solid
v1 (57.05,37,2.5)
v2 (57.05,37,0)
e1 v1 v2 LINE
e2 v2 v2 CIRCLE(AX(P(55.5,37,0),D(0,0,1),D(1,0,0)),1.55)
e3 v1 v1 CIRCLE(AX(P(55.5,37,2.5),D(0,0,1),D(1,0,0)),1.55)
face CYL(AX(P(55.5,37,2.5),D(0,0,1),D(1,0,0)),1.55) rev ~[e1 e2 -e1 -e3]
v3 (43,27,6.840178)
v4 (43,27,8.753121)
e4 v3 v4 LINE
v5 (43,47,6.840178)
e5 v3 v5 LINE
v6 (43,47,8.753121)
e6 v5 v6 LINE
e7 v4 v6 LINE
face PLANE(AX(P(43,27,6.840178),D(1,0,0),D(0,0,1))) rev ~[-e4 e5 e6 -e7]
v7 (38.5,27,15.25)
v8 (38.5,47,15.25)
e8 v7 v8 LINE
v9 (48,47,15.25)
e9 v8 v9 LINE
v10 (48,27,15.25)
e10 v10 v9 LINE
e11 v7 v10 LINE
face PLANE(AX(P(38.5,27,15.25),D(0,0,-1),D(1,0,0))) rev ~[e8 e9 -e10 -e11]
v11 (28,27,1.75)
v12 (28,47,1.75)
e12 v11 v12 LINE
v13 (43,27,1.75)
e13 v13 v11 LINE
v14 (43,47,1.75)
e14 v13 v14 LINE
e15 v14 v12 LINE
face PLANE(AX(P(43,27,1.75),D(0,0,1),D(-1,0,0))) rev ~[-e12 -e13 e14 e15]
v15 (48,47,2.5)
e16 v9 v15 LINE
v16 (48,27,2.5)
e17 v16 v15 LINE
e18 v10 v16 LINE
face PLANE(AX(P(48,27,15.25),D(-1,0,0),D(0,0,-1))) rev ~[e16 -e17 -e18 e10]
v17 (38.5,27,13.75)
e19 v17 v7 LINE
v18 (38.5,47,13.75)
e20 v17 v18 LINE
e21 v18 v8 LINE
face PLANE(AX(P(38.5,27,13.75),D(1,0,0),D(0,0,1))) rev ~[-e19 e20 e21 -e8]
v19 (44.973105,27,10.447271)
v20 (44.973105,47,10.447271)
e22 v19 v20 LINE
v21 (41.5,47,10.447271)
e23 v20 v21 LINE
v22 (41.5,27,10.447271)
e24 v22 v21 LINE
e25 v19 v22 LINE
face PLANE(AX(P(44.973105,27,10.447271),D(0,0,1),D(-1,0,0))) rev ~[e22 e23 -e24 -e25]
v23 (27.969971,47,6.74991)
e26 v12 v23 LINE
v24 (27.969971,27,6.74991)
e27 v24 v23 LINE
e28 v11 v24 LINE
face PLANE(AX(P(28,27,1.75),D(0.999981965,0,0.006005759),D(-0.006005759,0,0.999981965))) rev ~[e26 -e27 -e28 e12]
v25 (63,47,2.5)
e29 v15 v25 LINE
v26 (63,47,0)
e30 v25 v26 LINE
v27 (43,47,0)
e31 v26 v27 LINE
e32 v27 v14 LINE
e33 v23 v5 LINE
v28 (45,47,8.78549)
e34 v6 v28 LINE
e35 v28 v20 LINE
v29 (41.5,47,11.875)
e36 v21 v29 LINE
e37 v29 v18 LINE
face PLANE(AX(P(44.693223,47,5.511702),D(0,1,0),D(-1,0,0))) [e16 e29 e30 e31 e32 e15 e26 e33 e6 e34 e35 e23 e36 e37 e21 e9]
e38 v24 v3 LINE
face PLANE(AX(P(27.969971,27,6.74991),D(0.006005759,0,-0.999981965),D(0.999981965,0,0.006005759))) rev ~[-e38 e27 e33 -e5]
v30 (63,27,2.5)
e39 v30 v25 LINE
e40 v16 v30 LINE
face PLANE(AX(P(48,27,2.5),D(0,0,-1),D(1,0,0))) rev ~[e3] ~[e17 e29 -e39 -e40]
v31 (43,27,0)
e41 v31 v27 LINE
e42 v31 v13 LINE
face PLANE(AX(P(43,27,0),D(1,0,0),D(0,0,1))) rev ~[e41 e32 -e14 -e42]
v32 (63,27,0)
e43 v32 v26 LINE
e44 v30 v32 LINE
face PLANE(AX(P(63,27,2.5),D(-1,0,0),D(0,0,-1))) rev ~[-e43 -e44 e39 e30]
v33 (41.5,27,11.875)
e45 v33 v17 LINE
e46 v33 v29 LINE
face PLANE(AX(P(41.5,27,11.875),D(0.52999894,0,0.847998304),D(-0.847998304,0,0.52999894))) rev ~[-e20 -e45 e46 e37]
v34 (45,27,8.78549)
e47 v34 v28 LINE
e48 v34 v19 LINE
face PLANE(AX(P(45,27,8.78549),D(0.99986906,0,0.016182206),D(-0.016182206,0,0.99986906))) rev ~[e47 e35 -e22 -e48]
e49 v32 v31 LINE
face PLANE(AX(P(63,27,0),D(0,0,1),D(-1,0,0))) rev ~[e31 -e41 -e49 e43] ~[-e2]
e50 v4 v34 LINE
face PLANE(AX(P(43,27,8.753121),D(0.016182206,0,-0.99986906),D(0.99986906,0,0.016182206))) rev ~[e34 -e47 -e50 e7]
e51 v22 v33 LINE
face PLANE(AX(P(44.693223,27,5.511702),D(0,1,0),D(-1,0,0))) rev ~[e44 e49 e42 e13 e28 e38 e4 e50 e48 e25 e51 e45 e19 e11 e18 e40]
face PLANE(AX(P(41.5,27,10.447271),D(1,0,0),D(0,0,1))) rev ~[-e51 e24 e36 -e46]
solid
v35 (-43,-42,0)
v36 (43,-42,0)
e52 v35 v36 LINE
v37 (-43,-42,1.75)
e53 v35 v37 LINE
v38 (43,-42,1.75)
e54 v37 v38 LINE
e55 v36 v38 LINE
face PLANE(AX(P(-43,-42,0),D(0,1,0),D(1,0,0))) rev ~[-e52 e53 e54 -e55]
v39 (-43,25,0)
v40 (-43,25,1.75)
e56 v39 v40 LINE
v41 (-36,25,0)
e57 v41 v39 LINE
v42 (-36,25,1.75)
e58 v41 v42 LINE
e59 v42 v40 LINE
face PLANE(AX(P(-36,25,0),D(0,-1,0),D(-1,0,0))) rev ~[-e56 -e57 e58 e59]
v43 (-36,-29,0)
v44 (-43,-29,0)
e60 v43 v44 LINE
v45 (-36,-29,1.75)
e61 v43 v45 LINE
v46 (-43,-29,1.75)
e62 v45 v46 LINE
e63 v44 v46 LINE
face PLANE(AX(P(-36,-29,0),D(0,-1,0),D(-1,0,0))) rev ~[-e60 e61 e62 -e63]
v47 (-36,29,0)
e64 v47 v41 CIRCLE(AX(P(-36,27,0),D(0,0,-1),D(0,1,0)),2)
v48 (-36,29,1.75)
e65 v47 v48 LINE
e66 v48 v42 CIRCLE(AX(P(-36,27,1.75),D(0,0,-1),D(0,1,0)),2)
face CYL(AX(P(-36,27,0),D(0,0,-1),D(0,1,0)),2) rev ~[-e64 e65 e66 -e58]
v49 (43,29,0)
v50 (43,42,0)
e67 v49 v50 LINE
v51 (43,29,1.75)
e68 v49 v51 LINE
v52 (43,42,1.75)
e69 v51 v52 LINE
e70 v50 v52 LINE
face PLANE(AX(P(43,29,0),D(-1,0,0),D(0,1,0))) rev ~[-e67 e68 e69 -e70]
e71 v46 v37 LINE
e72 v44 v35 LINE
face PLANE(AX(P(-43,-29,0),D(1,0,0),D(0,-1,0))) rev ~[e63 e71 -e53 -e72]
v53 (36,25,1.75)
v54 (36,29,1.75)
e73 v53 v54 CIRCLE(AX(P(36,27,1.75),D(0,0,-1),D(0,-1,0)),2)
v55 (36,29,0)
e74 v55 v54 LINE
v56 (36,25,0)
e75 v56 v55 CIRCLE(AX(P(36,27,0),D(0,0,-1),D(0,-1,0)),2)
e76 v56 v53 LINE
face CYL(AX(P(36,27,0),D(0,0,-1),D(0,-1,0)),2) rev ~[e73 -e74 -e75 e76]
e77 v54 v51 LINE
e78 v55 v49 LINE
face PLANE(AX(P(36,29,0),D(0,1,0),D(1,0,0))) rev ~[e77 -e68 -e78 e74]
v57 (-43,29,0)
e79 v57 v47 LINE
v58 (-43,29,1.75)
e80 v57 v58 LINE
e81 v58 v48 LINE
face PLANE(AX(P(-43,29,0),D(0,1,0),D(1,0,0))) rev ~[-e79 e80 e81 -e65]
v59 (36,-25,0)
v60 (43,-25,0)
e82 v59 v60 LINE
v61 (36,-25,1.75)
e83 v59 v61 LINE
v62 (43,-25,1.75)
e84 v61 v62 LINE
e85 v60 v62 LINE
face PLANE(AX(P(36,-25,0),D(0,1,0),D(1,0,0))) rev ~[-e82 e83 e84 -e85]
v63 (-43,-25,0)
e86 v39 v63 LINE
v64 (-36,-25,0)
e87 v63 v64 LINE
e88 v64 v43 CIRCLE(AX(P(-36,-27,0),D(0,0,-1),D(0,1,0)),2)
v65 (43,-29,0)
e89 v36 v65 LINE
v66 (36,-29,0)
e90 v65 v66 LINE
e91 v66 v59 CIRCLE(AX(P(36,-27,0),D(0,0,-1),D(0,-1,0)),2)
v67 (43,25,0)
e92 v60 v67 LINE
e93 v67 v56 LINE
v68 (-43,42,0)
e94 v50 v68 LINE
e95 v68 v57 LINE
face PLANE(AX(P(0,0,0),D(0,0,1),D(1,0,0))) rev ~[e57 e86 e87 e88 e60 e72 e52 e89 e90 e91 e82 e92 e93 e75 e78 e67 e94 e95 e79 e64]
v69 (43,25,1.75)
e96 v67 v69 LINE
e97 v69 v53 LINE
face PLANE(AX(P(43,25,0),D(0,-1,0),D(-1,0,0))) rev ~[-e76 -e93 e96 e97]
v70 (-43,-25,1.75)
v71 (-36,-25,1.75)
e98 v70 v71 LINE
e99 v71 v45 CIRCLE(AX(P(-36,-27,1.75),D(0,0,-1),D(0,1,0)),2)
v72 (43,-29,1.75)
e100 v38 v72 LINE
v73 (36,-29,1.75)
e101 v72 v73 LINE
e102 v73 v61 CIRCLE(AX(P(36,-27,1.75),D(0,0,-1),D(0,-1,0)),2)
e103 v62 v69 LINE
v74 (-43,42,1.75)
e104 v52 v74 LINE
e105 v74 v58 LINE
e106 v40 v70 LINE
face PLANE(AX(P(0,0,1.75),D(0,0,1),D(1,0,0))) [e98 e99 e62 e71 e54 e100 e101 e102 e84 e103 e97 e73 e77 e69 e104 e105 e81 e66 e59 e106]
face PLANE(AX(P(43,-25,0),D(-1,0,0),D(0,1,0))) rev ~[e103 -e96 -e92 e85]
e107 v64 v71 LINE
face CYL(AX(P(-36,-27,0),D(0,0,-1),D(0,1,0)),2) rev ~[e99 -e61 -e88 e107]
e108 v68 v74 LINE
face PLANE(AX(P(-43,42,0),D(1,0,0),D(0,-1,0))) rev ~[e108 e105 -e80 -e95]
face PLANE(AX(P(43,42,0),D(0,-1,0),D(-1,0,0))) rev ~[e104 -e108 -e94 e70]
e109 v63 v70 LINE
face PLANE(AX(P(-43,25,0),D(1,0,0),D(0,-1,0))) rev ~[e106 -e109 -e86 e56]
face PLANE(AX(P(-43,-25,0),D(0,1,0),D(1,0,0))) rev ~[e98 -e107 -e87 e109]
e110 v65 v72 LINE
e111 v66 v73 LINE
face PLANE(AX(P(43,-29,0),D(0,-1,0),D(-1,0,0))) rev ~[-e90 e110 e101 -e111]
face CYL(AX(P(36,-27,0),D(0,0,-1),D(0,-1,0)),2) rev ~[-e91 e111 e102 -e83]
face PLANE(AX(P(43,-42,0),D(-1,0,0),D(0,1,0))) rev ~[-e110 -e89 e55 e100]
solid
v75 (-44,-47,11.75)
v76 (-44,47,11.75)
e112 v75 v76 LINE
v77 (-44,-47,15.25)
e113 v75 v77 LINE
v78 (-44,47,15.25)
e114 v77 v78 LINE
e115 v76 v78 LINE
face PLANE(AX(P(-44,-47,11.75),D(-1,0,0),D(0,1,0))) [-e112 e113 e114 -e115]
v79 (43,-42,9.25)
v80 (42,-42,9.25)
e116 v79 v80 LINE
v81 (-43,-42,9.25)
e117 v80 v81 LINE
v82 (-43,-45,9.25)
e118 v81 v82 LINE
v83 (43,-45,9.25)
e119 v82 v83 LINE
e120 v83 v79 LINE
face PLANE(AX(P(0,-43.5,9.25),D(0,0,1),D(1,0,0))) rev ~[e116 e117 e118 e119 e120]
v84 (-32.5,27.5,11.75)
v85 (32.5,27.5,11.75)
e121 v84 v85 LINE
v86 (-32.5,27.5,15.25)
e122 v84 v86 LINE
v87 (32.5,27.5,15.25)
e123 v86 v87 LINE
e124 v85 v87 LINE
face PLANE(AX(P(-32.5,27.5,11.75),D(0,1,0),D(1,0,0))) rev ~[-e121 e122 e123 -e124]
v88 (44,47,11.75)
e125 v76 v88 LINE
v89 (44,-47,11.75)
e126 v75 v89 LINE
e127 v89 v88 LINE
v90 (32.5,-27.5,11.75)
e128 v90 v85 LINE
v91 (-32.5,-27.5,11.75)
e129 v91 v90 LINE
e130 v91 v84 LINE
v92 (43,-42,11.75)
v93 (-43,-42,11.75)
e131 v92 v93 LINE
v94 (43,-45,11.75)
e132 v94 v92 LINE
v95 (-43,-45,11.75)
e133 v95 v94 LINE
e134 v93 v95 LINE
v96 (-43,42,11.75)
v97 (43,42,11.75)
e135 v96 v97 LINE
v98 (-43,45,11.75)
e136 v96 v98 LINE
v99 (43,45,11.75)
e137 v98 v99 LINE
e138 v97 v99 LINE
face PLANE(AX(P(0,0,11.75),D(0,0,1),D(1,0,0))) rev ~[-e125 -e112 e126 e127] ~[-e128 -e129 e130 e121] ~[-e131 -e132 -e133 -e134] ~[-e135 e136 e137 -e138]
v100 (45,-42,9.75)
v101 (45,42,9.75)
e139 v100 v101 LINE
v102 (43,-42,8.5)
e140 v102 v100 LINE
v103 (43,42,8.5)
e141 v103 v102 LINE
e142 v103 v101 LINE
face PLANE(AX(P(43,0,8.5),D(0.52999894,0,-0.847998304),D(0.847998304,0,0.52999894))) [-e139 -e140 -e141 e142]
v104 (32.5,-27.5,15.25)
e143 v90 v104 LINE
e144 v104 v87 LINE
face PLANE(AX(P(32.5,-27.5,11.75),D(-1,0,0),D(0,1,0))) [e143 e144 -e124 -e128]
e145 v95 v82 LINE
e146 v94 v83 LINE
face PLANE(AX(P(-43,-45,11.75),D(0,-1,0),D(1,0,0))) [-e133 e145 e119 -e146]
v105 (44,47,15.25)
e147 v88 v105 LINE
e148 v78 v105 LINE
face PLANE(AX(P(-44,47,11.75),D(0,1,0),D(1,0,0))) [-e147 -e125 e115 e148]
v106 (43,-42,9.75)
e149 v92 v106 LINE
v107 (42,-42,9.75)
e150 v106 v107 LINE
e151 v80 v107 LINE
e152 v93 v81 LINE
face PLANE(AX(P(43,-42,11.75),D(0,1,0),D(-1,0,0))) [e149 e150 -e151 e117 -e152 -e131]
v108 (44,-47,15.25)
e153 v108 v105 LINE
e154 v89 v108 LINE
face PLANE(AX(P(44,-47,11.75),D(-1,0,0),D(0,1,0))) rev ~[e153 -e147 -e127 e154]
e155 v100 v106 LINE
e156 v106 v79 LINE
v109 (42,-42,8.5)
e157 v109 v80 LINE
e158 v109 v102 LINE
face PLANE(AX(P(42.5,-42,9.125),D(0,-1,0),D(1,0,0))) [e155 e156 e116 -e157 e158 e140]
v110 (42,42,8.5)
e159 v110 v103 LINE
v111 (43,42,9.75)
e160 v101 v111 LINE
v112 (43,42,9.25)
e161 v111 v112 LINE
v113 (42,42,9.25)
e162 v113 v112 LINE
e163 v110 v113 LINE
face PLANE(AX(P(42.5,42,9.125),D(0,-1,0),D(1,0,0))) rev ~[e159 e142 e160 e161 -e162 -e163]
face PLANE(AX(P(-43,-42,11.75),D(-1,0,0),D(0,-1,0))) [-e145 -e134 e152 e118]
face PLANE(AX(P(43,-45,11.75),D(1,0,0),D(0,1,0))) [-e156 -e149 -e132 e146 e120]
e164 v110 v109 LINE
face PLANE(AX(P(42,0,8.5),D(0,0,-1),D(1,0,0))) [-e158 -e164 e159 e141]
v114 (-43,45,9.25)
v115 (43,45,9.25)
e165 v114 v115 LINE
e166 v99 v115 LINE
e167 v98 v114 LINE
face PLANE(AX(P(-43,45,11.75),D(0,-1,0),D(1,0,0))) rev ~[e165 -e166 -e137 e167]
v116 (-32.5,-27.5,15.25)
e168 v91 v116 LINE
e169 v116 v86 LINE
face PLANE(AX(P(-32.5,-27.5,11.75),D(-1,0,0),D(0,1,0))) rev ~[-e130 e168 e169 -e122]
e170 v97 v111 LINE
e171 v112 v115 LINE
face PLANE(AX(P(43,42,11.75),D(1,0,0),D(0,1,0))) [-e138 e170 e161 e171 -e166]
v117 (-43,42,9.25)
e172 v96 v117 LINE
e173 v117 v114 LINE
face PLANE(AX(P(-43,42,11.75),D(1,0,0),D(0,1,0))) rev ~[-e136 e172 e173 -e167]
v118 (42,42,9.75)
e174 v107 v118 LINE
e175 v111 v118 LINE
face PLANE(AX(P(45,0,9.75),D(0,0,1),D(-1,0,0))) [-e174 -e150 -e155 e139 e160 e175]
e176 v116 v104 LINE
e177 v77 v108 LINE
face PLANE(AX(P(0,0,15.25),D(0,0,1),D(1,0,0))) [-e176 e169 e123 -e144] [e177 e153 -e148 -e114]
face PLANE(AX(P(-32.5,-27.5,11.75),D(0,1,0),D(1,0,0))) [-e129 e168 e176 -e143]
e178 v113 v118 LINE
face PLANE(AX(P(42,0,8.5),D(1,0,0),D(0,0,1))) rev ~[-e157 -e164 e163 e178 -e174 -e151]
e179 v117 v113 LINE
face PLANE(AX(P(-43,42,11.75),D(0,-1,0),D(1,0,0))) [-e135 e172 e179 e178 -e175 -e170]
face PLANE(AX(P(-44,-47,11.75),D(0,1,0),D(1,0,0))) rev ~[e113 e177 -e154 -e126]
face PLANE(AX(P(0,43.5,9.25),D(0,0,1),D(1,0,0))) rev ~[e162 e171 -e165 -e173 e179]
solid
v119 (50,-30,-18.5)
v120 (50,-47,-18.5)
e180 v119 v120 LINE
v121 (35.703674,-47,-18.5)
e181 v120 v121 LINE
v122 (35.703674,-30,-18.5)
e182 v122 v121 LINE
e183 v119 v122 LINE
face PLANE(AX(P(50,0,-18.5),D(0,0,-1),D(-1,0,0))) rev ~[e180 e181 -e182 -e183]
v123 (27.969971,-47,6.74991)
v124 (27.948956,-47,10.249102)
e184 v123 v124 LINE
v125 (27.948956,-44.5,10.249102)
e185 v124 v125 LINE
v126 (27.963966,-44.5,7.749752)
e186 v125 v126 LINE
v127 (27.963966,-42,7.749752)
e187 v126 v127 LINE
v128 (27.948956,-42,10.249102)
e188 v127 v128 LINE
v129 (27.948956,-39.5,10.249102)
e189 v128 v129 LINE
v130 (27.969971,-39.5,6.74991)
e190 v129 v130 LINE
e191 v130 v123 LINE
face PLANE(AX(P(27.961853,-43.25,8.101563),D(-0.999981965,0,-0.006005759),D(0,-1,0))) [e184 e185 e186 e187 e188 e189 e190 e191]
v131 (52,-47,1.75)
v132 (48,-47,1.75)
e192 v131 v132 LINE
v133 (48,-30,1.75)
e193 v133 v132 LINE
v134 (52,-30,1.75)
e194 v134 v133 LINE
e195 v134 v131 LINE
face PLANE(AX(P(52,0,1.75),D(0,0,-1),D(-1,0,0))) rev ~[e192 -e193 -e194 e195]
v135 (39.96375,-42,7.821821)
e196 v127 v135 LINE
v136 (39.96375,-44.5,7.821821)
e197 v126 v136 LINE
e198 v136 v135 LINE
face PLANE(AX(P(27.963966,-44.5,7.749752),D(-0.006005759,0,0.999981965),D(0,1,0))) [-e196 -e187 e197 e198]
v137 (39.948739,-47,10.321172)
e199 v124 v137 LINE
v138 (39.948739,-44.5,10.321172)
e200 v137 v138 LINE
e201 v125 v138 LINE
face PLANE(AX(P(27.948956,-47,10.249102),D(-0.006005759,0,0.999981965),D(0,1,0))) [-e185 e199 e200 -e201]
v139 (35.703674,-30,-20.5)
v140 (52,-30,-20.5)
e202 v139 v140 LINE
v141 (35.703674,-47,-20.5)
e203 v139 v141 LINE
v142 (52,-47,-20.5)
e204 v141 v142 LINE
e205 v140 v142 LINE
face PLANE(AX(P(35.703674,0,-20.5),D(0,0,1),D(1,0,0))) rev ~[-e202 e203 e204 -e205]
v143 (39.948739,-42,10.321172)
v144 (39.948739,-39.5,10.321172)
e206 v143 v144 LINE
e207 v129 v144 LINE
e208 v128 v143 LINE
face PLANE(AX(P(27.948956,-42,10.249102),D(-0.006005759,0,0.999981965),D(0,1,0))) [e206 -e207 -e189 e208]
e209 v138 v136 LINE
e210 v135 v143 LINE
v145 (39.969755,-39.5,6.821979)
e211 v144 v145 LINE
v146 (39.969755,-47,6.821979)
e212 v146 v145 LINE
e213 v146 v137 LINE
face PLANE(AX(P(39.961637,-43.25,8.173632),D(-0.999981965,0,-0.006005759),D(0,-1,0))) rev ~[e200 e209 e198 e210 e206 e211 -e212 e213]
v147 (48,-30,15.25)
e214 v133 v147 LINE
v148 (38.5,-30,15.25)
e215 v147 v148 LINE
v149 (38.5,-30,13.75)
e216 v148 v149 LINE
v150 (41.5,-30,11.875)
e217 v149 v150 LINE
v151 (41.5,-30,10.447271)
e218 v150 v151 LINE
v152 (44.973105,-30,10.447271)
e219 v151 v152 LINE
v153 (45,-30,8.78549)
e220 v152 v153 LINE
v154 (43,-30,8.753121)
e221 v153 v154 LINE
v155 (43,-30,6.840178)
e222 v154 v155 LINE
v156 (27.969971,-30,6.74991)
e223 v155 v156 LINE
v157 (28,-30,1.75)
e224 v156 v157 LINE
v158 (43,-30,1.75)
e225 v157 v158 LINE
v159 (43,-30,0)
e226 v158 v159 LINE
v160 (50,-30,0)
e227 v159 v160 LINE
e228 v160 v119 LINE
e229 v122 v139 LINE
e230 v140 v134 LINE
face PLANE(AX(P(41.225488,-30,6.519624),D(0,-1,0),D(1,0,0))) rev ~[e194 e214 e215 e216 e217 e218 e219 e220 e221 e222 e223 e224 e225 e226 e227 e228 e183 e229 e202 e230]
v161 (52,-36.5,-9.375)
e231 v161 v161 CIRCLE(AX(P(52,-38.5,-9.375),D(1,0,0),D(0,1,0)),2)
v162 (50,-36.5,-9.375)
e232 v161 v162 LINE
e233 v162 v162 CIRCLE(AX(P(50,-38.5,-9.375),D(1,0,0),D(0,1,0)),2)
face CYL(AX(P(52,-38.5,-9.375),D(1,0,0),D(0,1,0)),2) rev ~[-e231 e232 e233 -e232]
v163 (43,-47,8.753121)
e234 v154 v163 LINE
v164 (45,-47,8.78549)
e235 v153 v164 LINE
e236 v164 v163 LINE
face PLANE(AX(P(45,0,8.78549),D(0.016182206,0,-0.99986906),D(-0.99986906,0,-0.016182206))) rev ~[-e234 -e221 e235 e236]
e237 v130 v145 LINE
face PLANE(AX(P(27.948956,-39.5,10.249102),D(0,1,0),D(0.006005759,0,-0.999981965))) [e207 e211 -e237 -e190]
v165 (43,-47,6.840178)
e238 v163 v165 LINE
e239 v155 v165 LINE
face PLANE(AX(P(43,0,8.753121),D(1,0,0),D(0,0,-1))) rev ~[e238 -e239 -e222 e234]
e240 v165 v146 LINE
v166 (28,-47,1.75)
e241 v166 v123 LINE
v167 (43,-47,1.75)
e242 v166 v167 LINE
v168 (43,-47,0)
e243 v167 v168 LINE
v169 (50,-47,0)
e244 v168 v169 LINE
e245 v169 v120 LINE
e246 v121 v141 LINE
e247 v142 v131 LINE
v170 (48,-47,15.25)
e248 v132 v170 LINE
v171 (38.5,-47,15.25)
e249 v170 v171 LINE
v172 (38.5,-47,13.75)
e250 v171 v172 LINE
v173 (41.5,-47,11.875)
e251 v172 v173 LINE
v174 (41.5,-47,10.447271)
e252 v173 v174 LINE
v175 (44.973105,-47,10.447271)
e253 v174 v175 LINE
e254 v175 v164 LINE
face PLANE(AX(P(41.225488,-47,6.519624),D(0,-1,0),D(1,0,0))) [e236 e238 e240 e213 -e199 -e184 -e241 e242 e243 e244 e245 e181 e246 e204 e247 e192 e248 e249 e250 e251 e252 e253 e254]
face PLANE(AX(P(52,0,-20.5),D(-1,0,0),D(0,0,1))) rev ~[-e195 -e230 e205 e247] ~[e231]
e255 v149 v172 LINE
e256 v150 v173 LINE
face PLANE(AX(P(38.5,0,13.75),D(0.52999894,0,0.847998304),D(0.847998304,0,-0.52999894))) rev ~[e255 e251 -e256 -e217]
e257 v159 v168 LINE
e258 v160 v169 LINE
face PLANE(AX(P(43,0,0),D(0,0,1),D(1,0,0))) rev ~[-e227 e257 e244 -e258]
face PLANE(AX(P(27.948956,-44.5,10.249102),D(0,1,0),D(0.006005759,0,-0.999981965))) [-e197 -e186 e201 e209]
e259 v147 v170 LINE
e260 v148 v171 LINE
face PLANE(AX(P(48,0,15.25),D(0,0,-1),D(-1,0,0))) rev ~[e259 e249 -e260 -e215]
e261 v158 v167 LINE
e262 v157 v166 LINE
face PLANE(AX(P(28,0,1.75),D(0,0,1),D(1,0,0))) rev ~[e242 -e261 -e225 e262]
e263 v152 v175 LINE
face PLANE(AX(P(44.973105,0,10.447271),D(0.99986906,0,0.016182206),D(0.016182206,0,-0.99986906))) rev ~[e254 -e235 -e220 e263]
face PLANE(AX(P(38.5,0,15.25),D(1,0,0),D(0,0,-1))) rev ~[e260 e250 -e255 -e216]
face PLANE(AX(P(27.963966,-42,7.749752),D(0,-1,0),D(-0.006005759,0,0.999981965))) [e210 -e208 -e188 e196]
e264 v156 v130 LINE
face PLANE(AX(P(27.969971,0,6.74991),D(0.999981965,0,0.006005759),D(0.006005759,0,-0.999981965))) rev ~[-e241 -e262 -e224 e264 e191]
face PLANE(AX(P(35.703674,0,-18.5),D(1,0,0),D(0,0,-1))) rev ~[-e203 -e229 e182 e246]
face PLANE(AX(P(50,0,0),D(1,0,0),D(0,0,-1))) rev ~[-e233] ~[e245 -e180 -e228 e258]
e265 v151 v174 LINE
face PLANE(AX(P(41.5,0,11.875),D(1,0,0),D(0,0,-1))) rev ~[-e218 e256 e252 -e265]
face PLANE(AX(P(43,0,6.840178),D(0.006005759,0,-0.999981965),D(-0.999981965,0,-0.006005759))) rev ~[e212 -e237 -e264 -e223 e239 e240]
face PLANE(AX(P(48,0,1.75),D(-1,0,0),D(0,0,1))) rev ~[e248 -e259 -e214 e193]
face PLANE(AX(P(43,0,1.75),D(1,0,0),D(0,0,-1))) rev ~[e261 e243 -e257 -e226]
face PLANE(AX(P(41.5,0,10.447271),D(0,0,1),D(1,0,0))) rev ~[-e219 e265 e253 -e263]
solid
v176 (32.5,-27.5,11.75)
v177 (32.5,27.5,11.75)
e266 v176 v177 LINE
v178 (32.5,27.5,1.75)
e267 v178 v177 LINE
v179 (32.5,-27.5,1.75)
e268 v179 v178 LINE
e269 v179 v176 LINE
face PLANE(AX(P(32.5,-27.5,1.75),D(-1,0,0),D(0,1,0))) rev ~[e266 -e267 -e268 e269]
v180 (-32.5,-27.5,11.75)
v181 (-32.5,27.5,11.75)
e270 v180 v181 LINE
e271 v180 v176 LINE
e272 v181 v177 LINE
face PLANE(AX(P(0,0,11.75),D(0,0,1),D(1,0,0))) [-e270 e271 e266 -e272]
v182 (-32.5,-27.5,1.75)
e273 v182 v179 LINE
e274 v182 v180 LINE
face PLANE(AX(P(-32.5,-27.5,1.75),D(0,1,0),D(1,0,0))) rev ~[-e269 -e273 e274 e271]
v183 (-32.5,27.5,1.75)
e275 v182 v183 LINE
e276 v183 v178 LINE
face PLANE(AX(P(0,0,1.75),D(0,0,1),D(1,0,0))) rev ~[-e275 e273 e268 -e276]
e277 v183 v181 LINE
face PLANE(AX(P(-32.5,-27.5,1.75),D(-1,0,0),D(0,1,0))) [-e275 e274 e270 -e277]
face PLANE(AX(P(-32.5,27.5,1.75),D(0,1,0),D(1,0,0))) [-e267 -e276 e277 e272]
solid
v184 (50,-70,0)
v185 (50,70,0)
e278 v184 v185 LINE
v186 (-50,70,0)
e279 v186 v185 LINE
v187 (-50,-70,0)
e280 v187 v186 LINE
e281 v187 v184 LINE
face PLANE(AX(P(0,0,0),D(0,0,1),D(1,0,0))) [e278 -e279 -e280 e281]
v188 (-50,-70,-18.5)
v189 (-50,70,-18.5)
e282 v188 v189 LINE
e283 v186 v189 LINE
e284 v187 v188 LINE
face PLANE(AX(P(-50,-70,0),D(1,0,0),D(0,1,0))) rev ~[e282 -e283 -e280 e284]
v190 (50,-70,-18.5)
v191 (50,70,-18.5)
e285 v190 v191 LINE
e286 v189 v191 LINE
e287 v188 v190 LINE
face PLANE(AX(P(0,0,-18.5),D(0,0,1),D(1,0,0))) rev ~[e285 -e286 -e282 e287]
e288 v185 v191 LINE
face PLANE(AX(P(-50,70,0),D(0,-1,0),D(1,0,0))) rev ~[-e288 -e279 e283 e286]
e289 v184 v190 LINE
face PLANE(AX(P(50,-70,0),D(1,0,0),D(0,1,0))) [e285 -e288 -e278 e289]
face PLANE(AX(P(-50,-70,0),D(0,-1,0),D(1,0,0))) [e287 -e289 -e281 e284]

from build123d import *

# Parameters (mm, degrees)
F0_W           = 100
F0_H           = 140
F1_DEPTH       = 18.5
F3_DEPTH       = 1.75
F4_W           = 65
F4_H           = 55
F5_DEPTH       = 10
F6_W           = 88
F6_H           = 94
F6_W_2         = 86
F6_H_2         = 84
F6_W_3         = 65
F6_H_3         = 55
F6_H_4         = 3
F7_DEPTH       = 3.5
F8_DEPTH       = 2.5
F9_W           = 1
F9_H           = 1.25
F10_DEPTH      = 42
F10_DEPTH_BACK = 42
F12_DEPTH      = 47
F13_DEPTH      = 30
F15_DEPTH      = 12
F16_R          = 2
F17_DEPTH      = 3
F20_DEPTH      = 20
F21_R          = 1.55
F22_DEPTH      = 25


with BuildPart() as f1:
    # F0 (on Top) → F1 (new body)
    with BuildSketch(Plane.XY):
        Rectangle(F0_W, F0_H)
    extrude(amount=-F1_DEPTH)


with BuildPart() as f3:
    # F2 (on Top) → F3 (new body)
    with BuildSketch(Plane.XY):
        with BuildLine():
            Line((43, 42), (-43, 42))
            Line((-43, 42), (-43, 29))
            Line((-43, 29), (-36, 29))
            ThreePointArc((-36, 29), (-34, 27), (-36, 25))
            Line((-36, 25), (-43, 25))
            Line((-43, 25), (-43, -25))
            Line((-43, -25), (-36, -25))
            ThreePointArc((-36, -25), (-34, -27), (-36, -29))
            Line((-36, -29), (-43, -29))
            Line((-43, -29), (-43, -42))
            Line((-43, -42), (43, -42))
            Line((43, -42), (43, -29))
            Line((43, -29), (36, -29))
            ThreePointArc((36, -29), (34, -27), (36, -25))
            Line((36, -25), (43, -25))
            Line((43, -25), (43, 25))
            Line((43, 25), (36, 25))
            ThreePointArc((36, 25), (34, 27), (36, 29))
            Line((36, 29), (43, 29))
            Line((43, 29), (43, 42))
        make_face()
    extrude(amount=F3_DEPTH)


with BuildPart() as f5:
    # F4 (on face) → F5 (new body)
    with BuildSketch(Plane.XY.offset(1.75)):
        Rectangle(F4_W, F4_H)
    extrude(amount=F5_DEPTH)


with BuildPart() as f7:
    # F6 (on face) → F7 (new body)
    with BuildSketch(Plane.XY.offset(11.75)):
        Rectangle(F6_W, F6_H)
        Polygon((-43, 42), (-43, 45), (43, 45), (43, 42), (43, -42), (43, -44), (43, -45), (-43, -45), (-43, -44), (-43, -42), align=None, mode=Mode.SUBTRACT)
        Rectangle(F6_W_2, F6_H_2)
        Rectangle(F6_W_3, F6_H_3, mode=Mode.SUBTRACT)
        with Locations((0, 43.5)):
            Rectangle(F6_W_2, F6_H_4)
        Polygon((43, -42), (-43, -42), (-43, -44), (-43, -45), (43, -45), (43, -44), align=None)
    extrude(amount=F7_DEPTH)

    # F6 (on face) → F8 (join)
    with BuildSketch(Plane.XY.offset(11.75)):
        with Locations((0, 43.5)):
            Rectangle(F6_W_2, F6_H_4)
        Polygon((43, -42), (-43, -42), (-43, -44), (-43, -45), (43, -45), (43, -44), align=None)
    extrude(amount=-F8_DEPTH)

    # F9 (on Front) → F10 (join, two sides)
    with BuildSketch(Plane.XZ) as f10_sk:
        with Locations((42.5, 9.125)):
            Rectangle(F9_W, F9_H)
        Polygon((43, 9.75), (43, 8.5), (45, 9.75), align=None)
    extrude(amount=F10_DEPTH)
    extrude(f10_sk.sketch, amount=-F10_DEPTH_BACK)


with BuildPart() as f12:
    # F11 (on Front) → F12 (new body)
    with BuildSketch(Plane.XZ):
        Polygon((27.9699712028, 6.7499098263), (28, 1.75), (43, 1.75), (43, 0), (48, 0), (50, 0), (52, 0), (52, 1.75), (48, 1.75), (48, 13.75), (48, 15.25), (38.5, 15.25), (38.5, 13.75), (41.5, 11.875), (41.5, 10.4472711682), (44.9731051922, 10.4472711682), (45, 8.7854899466), (43, 8.7531212961), (43, 6.8401781918), align=None)
        Polygon((52, 0), (50, 0), (50, -18.5), (35.7036739588, -18.5), (35.7036739588, -20.5), (52, -20.5), align=None)
    extrude(amount=F12_DEPTH)

    # F11 (on Front) → F13 (cut)
    with BuildSketch(Plane.XZ):
        Polygon((27.9699712028, 6.7499098263), (28, 1.75), (43, 1.75), (43, 0), (48, 0), (50, 0), (52, 0), (52, 1.75), (48, 1.75), (48, 13.75), (48, 15.25), (38.5, 15.25), (38.5, 13.75), (41.5, 11.875), (41.5, 10.4472711682), (44.9731051922, 10.4472711682), (45, 8.7854899466), (43, 8.7531212961), (43, 6.8401781918), align=None)
        Polygon((52, 0), (50, 0), (50, -18.5), (35.7036739588, -18.5), (35.7036739588, -20.5), (52, -20.5), align=None)
    extrude(amount=F13_DEPTH, mode=Mode.SUBTRACT)

    # F14 (on face) → F15 (join)
    with BuildSketch(Plane(origin=(28.0094999534, 0, 0.1682213529), x_dir=(0, -1, 0), z_dir=(-0.9999819653, 0, -0.0060057594))):
        Polygon((39.5, 5.9370710514), (47, 5.9370710514), (47, 7.0816674463), (47, 10.0810629427), (44.5, 10.0810629427), (44.5, 7.5816674463), (42, 7.5816674463), (42, 9.5810629427), (42, 10.0810629427), (39.5, 10.0810629427), (39.5, 9.5810629427), align=None)
    extrude(amount=-F15_DEPTH)

    # F16 (on face) → F17 (cut)
    with BuildSketch(Plane.YZ.offset(52)):
        with Locations((-38.5, -9.375)):
            Circle(F16_R)
    extrude(amount=-F17_DEPTH, mode=Mode.SUBTRACT)


with BuildPart() as f20:
    # F19 (on offset) → F20 (new body)
    with BuildSketch(Plane(origin=(0, 27, 0), x_dir=(-1, 0, 0), z_dir=(0, 1, 0))):
        Polygon((-43, 1.75), (-28, 1.75), (-27.9699712028, 6.7499098263), (-43, 6.8401781918), (-43, 8.7531212961), (-45, 8.7854899466), (-44.9731051922, 10.4472711682), (-41.5, 10.4472711682), (-41.5, 11.875), (-38.5, 13.75), (-38.5, 15.25), (-48, 15.25), (-48, 2.5), (-63, 2.5), (-63, 0), (-43, 0), align=None)
    extrude(amount=F20_DEPTH)

    # F21 (on face) → F22 (cut)
    with BuildSketch(Plane.XY.offset(2.5)):
        with Locations((55.5, 37)):
            Circle(F21_R)
    extrude(amount=-F22_DEPTH, mode=Mode.SUBTRACT)


solid = Compound([f1.part, f3.part, f5.part, f7.part, f12.part, f20.part])
